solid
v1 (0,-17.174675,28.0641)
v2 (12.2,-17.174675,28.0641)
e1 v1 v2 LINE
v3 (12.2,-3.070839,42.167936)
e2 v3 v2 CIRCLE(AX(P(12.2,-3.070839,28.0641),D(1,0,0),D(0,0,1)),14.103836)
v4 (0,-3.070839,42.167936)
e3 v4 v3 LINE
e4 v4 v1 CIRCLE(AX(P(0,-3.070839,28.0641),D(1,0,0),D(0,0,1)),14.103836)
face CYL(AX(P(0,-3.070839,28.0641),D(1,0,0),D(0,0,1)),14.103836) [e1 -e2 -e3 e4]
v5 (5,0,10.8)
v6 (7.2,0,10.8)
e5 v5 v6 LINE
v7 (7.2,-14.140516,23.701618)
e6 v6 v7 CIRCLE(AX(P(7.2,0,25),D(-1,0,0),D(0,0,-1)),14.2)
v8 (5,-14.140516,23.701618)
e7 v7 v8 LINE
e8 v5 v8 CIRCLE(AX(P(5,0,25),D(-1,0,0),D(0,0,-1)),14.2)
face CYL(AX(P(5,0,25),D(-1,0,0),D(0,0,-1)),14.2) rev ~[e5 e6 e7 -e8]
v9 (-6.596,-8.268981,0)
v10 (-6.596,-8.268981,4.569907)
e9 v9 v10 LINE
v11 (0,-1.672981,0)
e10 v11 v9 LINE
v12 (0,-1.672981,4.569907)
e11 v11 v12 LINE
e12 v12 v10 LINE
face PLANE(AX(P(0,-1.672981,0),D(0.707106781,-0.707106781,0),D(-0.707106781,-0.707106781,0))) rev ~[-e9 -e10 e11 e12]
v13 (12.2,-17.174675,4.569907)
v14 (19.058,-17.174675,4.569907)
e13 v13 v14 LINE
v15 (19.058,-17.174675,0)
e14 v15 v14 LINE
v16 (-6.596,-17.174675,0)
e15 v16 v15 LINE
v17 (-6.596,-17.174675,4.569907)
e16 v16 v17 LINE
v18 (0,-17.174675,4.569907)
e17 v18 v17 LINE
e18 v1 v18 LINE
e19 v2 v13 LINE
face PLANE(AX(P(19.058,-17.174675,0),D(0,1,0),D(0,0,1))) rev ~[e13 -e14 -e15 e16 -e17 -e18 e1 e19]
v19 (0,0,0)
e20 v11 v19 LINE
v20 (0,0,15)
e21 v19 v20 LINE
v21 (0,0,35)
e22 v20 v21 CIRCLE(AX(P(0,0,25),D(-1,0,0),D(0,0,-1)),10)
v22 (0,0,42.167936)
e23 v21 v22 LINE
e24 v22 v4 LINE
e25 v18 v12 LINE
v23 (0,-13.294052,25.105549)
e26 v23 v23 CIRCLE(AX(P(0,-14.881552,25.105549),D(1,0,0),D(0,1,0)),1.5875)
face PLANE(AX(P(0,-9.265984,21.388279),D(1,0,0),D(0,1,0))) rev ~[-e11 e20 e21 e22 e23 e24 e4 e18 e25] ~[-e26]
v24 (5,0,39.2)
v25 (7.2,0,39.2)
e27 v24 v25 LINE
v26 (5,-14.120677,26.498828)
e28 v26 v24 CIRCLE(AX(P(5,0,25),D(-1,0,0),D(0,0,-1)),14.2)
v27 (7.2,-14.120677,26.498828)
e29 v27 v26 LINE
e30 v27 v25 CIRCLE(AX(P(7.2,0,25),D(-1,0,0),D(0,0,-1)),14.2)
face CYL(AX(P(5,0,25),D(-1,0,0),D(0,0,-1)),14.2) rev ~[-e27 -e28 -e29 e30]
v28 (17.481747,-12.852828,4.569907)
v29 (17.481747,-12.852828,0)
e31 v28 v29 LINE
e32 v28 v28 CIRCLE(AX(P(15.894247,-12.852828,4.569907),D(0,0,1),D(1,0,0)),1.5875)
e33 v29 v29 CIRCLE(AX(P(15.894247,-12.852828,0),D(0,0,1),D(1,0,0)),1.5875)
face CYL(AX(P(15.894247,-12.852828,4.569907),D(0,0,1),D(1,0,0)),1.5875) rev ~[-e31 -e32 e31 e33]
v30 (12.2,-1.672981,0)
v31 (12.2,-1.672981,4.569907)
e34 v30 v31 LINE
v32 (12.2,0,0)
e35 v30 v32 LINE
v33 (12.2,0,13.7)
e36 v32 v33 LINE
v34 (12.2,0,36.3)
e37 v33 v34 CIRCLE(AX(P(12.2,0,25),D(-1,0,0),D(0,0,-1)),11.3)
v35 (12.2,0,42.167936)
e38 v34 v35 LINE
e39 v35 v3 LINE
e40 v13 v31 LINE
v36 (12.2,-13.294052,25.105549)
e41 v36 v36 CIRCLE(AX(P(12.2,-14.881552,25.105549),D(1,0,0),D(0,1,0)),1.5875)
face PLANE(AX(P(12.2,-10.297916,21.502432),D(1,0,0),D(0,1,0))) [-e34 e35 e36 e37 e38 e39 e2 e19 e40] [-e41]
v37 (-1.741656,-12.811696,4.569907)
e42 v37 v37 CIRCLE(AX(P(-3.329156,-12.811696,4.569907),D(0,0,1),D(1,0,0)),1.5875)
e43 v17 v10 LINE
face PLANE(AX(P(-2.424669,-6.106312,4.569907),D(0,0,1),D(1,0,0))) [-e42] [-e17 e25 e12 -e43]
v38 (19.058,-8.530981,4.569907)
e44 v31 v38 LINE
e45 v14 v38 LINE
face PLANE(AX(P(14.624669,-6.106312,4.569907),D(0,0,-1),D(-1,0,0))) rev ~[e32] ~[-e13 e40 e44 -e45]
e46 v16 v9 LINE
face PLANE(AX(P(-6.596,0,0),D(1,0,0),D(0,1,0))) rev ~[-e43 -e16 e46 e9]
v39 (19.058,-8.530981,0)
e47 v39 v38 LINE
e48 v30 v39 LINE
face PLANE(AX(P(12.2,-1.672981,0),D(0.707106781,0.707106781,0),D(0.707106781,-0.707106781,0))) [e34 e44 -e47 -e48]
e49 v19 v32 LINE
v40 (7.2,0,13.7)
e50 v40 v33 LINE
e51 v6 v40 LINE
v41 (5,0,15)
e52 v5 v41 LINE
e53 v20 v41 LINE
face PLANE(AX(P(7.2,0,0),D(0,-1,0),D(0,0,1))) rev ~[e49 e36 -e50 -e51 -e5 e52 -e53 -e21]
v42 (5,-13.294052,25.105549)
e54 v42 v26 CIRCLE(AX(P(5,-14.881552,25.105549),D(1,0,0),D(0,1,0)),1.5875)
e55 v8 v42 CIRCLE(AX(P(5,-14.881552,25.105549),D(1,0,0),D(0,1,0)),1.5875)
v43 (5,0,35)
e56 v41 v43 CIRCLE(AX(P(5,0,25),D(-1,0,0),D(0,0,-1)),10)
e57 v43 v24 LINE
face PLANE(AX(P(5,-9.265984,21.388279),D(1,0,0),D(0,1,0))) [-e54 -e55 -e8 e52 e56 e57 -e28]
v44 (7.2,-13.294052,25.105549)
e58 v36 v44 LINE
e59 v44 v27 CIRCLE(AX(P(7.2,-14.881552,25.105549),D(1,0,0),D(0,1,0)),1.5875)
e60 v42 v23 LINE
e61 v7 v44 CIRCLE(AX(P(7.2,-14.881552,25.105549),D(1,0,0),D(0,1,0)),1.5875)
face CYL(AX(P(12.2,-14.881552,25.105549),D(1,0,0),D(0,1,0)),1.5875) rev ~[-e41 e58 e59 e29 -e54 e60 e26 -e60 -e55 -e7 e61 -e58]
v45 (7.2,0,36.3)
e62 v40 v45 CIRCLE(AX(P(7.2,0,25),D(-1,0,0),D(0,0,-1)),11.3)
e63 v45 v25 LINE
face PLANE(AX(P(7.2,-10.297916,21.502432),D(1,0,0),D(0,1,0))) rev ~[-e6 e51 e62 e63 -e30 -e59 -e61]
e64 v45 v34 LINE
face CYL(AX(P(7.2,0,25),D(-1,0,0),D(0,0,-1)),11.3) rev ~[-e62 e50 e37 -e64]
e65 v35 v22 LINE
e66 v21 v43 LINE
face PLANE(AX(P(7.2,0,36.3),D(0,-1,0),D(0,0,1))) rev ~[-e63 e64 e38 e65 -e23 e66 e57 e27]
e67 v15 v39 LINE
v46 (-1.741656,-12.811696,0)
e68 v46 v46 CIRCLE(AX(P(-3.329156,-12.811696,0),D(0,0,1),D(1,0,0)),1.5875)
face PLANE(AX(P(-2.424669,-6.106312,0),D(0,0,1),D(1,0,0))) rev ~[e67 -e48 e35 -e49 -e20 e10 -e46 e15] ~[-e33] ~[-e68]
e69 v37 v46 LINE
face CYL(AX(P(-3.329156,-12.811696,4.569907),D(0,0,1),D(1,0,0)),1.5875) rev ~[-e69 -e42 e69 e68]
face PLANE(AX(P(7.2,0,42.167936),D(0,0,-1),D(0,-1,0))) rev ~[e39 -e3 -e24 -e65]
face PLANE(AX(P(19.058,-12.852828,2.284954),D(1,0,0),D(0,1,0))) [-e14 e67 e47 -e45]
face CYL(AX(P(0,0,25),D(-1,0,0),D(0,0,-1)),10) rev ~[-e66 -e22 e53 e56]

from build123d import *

# Parameters (mm, degrees)
F1_DEPTH     = 5
F3_DEPTH     = 2.2
F5_DEPTH     = 5
F6_R         = 14.1038356314
F7_W         = 8.643694222
F7_H         = 4.569907207
F8_DEPTH     = 6.858
F10_DEPTH    = 25.654
F9_R         = 1.5875
F11_DEPTH    = 26.924
F12_R        = 1.5875
F13_DEPTH    = 9.5758
F14_T4_DEPTH = 4.569907207
F14_T9_DEPTH = 4.569907207
F15_R        = 1.5875
F16_DEPTH    = 18.034


# Not quite as in the source:
# - a fillet or chamfer that OpenCascade refuses, or shapes differently, is made with other operations: its cross-section is extruded or revolved along the edge and cut away or added


with BuildPart() as f1:
    # F0 (on Right) → F1 (new body)
    with BuildSketch(Plane.YZ):
        with BuildLine():
            Line((-17.1746751294, 0), (0, 0))
            Line((0, 0), (0, 15))
            ThreePointArc((0, 15), (-10, 25), (0, 35))
            Line((0, 35), (0, 42.1679355204))
            Line((0, 42.1679355204), (-17.1746751294, 42.1679355204))
            Line((-17.1746751294, 42.1679355204), (-17.1746751294, 0))
        make_face()
    extrude(amount=F1_DEPTH)

    # F2 (on face) → F3 (join)
    with BuildSketch(Plane.YZ.offset(5)):
        with BuildLine():
            ThreePointArc((0, 10.8), (-14.2, 25), (0, 39.2))
            Line((0, 39.2), (0, 42.1679355204))
            Line((0, 42.1679355204), (-17.1746751294, 42.1679355204))
            Line((-17.1746751294, 42.1679355204), (-17.1746751294, 0))
            Line((-17.1746751294, 0), (0, 0))
            Line((0, 0), (0, 10.8))
        make_face()
    extrude(amount=F3_DEPTH)

    # F4 (on face) → F5 (join)
    with BuildSketch(Plane.YZ.offset(7.2)):
        with BuildLine():
            ThreePointArc((0, 10.8), (-14.2, 25), (0, 39.2))
            Line((0, 39.2), (0, 42.1679355204))
            Line((0, 42.1679355204), (-17.1746751294, 42.1679355204))
            Line((-17.1746751294, 42.1679355204), (-17.1746751294, 0))
            Line((-17.1746751294, 0), (0, 0))
            Line((0, 0), (0, 10.8))
        make_face()
        with BuildLine():
            ThreePointArc((0, 13.7), (-11.3, 25), (0, 36.3))
            Line((0, 36.3), (0, 39.2))
            ThreePointArc((0, 39.2), (-14.2, 25), (0, 10.8))
            Line((0, 10.8), (0, 13.7))
        make_face()
    extrude(amount=F5_DEPTH)

    # F6
    f6_edges = [f1.edges().sort_by_distance(p)[0] for p in [
        (6.1, -17.174675, 42.167936),
    ]]
    fillet(f6_edges, radius=F6_R)

    # F7 (on face) → F8 (join)
    with BuildSketch(Plane.YZ.offset(12.2)):
        with Locations((-12.8528280184, 2.2849536035)):
            Rectangle(F7_W, F7_H)
    extrude(amount=F8_DEPTH)

    # F10 (add): a face of the model
    f10_faces = [f1.faces().sort_by_distance(p)[0] for p in [
        (19.058, -12.8528280184, 2.2849536035),
    ]]
    extrude(f10_faces, amount=-F10_DEPTH)

    # F9 (on face) → F11 (cut)
    with BuildSketch(Plane.XY.offset(4.569907207)):
        with Locations((15.894247219, -12.8528280184)):
            Circle(F9_R)
    extrude(amount=-F11_DEPTH, mode=Mode.SUBTRACT)

    # F12 (on face) → F13 (cut)
    with BuildSketch(Plane.XY.offset(4.569907207)):
        with Locations((-3.329155501, -12.8116961569)):
            Circle(F12_R)
    extrude(amount=-F13_DEPTH, mode=Mode.SUBTRACT)

    # F14: chamfer of 6.858 on 2 edges, made by hand


with BuildPart() as f14_tool2:
    # F14_s3 → F14_t4 (new body)
    with BuildSketch(Plane.XY):
        Polygon((12.2, -1.6729809074), (19.058, -8.5309809074), (12.2, -8.5309809074), align=None)
    extrude(amount=F14_T4_DEPTH)

    split(bisect_by=Plane.YZ.offset(19.058), keep=Keep.BOTTOM)


with BuildPart() as f1_1:
    add(f1.part)

    # F14_t1: union F14_tool2
    add(f14_tool2.part)


with BuildPart() as f14_tool7:
    # F14_s8 → F14_t9 (new body)
    with BuildSketch(Plane.XY):
        Polygon((0, -1.6729809074), (-6.858, -8.5309809074), (0, -8.5309809074), align=None)
    extrude(amount=F14_T9_DEPTH)

    split(bisect_by=Plane.YZ.offset(-6.596), keep=Keep.TOP)


with BuildPart() as f1_2:
    add(f1_1.part)

    # F14_t6: union F14_tool7
    add(f14_tool7.part)

    # F15 (on face) → F16 (cut)
    with BuildSketch(Plane.YZ.offset(12.2)):
        with Locations((-14.881552197, 25.1055490226)):
            Circle(F15_R)
    extrude(amount=-F16_DEPTH, mode=Mode.SUBTRACT)


solid = f1_2.part
